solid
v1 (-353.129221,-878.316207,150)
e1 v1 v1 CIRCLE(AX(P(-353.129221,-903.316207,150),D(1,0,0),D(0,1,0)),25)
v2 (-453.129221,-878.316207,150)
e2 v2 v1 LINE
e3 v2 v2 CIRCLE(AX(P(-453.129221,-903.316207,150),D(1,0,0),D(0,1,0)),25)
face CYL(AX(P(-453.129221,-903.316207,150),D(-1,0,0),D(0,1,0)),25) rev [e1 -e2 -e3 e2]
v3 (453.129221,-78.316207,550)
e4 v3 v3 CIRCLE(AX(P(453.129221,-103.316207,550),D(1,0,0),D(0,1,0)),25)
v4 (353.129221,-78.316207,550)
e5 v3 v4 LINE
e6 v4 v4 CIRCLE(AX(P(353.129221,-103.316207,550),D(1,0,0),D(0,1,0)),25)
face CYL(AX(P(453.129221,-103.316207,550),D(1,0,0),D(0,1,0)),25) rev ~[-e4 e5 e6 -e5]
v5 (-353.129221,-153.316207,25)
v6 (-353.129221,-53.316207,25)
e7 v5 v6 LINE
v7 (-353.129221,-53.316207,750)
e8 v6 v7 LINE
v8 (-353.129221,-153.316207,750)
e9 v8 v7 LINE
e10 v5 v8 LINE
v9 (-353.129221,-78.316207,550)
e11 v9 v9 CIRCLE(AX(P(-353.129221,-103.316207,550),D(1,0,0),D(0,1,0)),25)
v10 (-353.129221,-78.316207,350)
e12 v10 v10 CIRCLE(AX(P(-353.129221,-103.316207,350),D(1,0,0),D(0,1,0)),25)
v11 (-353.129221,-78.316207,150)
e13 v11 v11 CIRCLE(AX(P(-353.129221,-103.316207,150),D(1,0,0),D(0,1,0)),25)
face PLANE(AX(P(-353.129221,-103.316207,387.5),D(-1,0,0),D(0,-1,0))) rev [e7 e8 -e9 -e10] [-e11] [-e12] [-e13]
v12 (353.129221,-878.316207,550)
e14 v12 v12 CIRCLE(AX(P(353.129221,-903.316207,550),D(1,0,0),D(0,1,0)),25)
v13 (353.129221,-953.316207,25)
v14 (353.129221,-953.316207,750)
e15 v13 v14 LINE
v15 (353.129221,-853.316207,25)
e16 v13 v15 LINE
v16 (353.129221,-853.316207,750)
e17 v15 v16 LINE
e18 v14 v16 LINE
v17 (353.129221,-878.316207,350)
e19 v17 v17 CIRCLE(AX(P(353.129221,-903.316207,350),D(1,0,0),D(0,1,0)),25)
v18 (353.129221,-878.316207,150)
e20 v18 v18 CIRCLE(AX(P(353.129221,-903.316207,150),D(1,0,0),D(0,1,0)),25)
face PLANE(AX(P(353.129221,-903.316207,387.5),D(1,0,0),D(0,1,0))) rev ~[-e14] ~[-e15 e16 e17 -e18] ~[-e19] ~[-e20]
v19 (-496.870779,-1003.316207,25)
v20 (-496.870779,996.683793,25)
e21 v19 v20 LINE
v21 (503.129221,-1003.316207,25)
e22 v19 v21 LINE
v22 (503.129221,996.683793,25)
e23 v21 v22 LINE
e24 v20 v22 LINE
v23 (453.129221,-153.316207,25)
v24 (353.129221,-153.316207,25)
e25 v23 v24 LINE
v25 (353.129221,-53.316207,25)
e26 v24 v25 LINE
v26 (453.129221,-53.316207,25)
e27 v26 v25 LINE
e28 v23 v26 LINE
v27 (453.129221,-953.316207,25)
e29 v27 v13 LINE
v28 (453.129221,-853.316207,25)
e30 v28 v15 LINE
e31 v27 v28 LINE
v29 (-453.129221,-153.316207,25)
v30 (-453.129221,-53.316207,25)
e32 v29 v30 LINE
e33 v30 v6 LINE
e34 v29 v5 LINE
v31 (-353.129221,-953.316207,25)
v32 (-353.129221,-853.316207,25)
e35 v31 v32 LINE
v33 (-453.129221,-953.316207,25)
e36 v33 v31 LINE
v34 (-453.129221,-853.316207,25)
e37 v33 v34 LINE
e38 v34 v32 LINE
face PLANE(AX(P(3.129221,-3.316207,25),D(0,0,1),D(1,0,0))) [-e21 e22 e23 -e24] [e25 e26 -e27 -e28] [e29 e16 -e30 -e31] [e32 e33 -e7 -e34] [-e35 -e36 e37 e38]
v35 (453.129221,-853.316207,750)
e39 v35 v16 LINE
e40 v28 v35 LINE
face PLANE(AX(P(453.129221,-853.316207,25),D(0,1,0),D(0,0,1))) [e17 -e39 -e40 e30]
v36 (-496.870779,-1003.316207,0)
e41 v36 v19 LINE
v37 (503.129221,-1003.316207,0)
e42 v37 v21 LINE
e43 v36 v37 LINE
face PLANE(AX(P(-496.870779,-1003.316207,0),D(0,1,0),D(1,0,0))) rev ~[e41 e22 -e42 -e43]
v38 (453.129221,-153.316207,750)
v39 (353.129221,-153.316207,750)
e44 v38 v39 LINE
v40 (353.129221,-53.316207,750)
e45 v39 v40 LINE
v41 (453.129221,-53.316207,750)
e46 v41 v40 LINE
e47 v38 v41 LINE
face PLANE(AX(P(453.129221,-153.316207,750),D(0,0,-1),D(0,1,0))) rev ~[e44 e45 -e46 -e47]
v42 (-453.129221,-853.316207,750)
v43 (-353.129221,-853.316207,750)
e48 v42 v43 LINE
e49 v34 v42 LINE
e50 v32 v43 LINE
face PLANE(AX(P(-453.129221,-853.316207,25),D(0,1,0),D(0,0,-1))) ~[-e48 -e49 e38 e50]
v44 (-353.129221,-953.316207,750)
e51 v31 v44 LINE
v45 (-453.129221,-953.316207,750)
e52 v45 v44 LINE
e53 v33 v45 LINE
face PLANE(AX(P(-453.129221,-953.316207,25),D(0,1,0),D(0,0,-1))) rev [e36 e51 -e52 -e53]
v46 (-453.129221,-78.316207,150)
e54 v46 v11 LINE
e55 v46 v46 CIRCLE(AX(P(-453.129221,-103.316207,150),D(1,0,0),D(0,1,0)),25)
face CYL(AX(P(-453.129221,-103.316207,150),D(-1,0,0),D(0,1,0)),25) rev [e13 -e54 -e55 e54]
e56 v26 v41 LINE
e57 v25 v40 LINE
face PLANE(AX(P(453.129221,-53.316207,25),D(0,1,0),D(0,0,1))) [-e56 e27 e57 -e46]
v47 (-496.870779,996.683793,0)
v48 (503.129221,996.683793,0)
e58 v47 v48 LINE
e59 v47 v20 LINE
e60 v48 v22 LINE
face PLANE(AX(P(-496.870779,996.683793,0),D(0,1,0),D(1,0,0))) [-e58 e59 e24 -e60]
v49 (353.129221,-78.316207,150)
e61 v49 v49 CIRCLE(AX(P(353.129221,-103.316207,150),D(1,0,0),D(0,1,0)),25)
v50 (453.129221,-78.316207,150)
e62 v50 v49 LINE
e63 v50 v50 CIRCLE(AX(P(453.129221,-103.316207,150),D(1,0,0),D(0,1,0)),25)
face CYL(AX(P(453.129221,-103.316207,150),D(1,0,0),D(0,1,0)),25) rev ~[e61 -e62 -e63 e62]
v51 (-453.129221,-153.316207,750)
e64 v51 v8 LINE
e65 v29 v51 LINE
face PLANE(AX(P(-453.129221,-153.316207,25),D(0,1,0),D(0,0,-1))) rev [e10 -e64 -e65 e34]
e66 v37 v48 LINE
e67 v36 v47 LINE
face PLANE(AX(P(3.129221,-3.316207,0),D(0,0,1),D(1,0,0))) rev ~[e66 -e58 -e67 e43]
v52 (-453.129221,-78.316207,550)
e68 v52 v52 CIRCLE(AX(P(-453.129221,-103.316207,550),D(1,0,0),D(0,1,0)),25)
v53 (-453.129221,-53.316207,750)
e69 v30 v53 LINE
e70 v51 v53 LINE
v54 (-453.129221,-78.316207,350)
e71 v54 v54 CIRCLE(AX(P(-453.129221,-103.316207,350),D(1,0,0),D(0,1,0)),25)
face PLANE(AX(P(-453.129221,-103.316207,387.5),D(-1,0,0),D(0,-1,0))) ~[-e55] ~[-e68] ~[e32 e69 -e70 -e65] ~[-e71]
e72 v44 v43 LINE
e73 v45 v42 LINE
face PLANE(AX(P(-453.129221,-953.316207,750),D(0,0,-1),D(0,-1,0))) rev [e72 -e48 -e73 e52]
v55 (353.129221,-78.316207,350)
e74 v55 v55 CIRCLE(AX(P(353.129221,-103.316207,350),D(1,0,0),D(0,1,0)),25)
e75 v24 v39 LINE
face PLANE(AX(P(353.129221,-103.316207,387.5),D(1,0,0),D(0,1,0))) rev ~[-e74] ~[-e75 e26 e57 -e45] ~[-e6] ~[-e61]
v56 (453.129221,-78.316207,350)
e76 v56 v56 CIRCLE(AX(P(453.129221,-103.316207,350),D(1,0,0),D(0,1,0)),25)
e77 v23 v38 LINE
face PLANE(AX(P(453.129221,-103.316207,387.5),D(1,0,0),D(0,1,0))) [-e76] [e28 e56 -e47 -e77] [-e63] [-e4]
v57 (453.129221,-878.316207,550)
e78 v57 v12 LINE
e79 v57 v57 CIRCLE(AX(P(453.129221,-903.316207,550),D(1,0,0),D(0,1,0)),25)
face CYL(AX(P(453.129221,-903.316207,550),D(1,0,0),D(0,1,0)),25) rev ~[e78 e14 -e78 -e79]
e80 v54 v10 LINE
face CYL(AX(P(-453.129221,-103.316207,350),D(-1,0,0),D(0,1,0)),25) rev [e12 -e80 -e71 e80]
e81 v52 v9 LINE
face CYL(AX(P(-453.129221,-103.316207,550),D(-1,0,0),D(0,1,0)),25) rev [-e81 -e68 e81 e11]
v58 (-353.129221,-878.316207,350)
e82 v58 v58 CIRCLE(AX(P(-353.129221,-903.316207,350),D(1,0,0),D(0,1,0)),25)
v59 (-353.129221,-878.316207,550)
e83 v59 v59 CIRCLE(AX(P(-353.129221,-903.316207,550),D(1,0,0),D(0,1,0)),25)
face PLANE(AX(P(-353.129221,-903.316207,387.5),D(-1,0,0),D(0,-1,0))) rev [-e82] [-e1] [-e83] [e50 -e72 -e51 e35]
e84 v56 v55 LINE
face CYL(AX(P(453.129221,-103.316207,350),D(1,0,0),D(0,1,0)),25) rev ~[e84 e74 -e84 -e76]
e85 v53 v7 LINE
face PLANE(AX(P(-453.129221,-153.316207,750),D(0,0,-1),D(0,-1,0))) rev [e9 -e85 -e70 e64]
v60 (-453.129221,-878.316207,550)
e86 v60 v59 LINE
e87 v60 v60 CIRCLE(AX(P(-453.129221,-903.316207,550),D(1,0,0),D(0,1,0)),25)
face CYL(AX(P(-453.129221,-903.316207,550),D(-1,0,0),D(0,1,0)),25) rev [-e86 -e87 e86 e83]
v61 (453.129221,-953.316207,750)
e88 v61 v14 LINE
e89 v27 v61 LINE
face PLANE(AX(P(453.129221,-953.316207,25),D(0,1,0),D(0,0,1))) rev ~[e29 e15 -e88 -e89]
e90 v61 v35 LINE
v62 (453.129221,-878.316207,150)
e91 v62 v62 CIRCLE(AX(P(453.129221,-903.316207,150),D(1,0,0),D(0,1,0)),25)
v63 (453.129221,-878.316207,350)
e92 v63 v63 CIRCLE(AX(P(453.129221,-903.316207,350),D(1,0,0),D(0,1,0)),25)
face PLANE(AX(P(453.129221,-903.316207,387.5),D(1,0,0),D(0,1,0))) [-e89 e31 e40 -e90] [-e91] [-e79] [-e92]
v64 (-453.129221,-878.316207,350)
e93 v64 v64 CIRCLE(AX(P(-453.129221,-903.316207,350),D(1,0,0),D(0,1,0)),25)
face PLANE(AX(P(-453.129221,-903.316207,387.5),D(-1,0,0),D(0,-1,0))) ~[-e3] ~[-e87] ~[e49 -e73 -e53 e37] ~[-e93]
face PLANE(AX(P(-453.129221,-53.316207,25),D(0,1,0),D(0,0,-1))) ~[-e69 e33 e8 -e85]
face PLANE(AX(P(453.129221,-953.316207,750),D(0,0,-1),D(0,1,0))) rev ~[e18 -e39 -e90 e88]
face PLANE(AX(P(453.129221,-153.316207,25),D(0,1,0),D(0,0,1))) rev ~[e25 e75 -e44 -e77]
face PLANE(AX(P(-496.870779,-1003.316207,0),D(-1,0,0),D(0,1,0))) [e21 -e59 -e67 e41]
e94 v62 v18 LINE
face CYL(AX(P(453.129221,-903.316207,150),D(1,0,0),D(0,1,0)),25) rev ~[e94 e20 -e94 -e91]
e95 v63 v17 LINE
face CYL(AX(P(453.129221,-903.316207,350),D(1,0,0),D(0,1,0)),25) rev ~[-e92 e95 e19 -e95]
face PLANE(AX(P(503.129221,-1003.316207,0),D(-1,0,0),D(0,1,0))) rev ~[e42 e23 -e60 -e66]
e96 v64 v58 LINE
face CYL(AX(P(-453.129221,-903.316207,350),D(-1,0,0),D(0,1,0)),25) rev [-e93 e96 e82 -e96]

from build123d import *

# Parameters (mm, degrees)
F0_W     = 1000
F0_H     = 2000
F1_DEPTH = 25
F3_W     = 100
F3_H     = 725
F3_R     = 25
F4_DEPTH = 100


# Not quite as in the source:
# - a pattern or mirror of a feature is missing from the dataset's text; its kind, count and spacing are read off the source's solid


with BuildPart() as f1:
    # F0 (on Top) → F1 (new body)
    with BuildSketch(Plane.XY):
        with Locations((3.129221499, -3.3162072057)):
            Rectangle(F0_W, F0_H)
    extrude(amount=F1_DEPTH)

    # F3 (on offset) → F4 (join)
    with BuildSketch(Plane.YZ.offset(453.129221499)):
        with Locations((-903.3162072057, 387.5)):
            Rectangle(F3_W, F3_H)
        with Locations((-903.3162072057, 150)):
            Circle(F3_R, mode=Mode.SUBTRACT)
        with Locations((-903.3162072057, 350)):
            Circle(F3_R, mode=Mode.SUBTRACT)
        with Locations((-903.3162072057, 550)):
            Circle(F3_R, mode=Mode.SUBTRACT)
        with Locations((-103.3162072057, 387.5)):
            Rectangle(F3_W, F3_H)
        with Locations((-103.3162072057, 150)):
            Circle(F3_R, mode=Mode.SUBTRACT)
        with Locations((-103.3162072057, 350)):
            Circle(F3_R, mode=Mode.SUBTRACT)
        with Locations((-103.3162072057, 550)):
            Circle(F3_R, mode=Mode.SUBTRACT)
    f4 = extrude(amount=-F4_DEPTH)

    # F4_copies: F4 across plane
    add(f4.mirror(Plane(origin=(0, 0, 0), x_dir=(0, 0, -1), z_dir=(-1, 0, 0))))


solid = f1.part
